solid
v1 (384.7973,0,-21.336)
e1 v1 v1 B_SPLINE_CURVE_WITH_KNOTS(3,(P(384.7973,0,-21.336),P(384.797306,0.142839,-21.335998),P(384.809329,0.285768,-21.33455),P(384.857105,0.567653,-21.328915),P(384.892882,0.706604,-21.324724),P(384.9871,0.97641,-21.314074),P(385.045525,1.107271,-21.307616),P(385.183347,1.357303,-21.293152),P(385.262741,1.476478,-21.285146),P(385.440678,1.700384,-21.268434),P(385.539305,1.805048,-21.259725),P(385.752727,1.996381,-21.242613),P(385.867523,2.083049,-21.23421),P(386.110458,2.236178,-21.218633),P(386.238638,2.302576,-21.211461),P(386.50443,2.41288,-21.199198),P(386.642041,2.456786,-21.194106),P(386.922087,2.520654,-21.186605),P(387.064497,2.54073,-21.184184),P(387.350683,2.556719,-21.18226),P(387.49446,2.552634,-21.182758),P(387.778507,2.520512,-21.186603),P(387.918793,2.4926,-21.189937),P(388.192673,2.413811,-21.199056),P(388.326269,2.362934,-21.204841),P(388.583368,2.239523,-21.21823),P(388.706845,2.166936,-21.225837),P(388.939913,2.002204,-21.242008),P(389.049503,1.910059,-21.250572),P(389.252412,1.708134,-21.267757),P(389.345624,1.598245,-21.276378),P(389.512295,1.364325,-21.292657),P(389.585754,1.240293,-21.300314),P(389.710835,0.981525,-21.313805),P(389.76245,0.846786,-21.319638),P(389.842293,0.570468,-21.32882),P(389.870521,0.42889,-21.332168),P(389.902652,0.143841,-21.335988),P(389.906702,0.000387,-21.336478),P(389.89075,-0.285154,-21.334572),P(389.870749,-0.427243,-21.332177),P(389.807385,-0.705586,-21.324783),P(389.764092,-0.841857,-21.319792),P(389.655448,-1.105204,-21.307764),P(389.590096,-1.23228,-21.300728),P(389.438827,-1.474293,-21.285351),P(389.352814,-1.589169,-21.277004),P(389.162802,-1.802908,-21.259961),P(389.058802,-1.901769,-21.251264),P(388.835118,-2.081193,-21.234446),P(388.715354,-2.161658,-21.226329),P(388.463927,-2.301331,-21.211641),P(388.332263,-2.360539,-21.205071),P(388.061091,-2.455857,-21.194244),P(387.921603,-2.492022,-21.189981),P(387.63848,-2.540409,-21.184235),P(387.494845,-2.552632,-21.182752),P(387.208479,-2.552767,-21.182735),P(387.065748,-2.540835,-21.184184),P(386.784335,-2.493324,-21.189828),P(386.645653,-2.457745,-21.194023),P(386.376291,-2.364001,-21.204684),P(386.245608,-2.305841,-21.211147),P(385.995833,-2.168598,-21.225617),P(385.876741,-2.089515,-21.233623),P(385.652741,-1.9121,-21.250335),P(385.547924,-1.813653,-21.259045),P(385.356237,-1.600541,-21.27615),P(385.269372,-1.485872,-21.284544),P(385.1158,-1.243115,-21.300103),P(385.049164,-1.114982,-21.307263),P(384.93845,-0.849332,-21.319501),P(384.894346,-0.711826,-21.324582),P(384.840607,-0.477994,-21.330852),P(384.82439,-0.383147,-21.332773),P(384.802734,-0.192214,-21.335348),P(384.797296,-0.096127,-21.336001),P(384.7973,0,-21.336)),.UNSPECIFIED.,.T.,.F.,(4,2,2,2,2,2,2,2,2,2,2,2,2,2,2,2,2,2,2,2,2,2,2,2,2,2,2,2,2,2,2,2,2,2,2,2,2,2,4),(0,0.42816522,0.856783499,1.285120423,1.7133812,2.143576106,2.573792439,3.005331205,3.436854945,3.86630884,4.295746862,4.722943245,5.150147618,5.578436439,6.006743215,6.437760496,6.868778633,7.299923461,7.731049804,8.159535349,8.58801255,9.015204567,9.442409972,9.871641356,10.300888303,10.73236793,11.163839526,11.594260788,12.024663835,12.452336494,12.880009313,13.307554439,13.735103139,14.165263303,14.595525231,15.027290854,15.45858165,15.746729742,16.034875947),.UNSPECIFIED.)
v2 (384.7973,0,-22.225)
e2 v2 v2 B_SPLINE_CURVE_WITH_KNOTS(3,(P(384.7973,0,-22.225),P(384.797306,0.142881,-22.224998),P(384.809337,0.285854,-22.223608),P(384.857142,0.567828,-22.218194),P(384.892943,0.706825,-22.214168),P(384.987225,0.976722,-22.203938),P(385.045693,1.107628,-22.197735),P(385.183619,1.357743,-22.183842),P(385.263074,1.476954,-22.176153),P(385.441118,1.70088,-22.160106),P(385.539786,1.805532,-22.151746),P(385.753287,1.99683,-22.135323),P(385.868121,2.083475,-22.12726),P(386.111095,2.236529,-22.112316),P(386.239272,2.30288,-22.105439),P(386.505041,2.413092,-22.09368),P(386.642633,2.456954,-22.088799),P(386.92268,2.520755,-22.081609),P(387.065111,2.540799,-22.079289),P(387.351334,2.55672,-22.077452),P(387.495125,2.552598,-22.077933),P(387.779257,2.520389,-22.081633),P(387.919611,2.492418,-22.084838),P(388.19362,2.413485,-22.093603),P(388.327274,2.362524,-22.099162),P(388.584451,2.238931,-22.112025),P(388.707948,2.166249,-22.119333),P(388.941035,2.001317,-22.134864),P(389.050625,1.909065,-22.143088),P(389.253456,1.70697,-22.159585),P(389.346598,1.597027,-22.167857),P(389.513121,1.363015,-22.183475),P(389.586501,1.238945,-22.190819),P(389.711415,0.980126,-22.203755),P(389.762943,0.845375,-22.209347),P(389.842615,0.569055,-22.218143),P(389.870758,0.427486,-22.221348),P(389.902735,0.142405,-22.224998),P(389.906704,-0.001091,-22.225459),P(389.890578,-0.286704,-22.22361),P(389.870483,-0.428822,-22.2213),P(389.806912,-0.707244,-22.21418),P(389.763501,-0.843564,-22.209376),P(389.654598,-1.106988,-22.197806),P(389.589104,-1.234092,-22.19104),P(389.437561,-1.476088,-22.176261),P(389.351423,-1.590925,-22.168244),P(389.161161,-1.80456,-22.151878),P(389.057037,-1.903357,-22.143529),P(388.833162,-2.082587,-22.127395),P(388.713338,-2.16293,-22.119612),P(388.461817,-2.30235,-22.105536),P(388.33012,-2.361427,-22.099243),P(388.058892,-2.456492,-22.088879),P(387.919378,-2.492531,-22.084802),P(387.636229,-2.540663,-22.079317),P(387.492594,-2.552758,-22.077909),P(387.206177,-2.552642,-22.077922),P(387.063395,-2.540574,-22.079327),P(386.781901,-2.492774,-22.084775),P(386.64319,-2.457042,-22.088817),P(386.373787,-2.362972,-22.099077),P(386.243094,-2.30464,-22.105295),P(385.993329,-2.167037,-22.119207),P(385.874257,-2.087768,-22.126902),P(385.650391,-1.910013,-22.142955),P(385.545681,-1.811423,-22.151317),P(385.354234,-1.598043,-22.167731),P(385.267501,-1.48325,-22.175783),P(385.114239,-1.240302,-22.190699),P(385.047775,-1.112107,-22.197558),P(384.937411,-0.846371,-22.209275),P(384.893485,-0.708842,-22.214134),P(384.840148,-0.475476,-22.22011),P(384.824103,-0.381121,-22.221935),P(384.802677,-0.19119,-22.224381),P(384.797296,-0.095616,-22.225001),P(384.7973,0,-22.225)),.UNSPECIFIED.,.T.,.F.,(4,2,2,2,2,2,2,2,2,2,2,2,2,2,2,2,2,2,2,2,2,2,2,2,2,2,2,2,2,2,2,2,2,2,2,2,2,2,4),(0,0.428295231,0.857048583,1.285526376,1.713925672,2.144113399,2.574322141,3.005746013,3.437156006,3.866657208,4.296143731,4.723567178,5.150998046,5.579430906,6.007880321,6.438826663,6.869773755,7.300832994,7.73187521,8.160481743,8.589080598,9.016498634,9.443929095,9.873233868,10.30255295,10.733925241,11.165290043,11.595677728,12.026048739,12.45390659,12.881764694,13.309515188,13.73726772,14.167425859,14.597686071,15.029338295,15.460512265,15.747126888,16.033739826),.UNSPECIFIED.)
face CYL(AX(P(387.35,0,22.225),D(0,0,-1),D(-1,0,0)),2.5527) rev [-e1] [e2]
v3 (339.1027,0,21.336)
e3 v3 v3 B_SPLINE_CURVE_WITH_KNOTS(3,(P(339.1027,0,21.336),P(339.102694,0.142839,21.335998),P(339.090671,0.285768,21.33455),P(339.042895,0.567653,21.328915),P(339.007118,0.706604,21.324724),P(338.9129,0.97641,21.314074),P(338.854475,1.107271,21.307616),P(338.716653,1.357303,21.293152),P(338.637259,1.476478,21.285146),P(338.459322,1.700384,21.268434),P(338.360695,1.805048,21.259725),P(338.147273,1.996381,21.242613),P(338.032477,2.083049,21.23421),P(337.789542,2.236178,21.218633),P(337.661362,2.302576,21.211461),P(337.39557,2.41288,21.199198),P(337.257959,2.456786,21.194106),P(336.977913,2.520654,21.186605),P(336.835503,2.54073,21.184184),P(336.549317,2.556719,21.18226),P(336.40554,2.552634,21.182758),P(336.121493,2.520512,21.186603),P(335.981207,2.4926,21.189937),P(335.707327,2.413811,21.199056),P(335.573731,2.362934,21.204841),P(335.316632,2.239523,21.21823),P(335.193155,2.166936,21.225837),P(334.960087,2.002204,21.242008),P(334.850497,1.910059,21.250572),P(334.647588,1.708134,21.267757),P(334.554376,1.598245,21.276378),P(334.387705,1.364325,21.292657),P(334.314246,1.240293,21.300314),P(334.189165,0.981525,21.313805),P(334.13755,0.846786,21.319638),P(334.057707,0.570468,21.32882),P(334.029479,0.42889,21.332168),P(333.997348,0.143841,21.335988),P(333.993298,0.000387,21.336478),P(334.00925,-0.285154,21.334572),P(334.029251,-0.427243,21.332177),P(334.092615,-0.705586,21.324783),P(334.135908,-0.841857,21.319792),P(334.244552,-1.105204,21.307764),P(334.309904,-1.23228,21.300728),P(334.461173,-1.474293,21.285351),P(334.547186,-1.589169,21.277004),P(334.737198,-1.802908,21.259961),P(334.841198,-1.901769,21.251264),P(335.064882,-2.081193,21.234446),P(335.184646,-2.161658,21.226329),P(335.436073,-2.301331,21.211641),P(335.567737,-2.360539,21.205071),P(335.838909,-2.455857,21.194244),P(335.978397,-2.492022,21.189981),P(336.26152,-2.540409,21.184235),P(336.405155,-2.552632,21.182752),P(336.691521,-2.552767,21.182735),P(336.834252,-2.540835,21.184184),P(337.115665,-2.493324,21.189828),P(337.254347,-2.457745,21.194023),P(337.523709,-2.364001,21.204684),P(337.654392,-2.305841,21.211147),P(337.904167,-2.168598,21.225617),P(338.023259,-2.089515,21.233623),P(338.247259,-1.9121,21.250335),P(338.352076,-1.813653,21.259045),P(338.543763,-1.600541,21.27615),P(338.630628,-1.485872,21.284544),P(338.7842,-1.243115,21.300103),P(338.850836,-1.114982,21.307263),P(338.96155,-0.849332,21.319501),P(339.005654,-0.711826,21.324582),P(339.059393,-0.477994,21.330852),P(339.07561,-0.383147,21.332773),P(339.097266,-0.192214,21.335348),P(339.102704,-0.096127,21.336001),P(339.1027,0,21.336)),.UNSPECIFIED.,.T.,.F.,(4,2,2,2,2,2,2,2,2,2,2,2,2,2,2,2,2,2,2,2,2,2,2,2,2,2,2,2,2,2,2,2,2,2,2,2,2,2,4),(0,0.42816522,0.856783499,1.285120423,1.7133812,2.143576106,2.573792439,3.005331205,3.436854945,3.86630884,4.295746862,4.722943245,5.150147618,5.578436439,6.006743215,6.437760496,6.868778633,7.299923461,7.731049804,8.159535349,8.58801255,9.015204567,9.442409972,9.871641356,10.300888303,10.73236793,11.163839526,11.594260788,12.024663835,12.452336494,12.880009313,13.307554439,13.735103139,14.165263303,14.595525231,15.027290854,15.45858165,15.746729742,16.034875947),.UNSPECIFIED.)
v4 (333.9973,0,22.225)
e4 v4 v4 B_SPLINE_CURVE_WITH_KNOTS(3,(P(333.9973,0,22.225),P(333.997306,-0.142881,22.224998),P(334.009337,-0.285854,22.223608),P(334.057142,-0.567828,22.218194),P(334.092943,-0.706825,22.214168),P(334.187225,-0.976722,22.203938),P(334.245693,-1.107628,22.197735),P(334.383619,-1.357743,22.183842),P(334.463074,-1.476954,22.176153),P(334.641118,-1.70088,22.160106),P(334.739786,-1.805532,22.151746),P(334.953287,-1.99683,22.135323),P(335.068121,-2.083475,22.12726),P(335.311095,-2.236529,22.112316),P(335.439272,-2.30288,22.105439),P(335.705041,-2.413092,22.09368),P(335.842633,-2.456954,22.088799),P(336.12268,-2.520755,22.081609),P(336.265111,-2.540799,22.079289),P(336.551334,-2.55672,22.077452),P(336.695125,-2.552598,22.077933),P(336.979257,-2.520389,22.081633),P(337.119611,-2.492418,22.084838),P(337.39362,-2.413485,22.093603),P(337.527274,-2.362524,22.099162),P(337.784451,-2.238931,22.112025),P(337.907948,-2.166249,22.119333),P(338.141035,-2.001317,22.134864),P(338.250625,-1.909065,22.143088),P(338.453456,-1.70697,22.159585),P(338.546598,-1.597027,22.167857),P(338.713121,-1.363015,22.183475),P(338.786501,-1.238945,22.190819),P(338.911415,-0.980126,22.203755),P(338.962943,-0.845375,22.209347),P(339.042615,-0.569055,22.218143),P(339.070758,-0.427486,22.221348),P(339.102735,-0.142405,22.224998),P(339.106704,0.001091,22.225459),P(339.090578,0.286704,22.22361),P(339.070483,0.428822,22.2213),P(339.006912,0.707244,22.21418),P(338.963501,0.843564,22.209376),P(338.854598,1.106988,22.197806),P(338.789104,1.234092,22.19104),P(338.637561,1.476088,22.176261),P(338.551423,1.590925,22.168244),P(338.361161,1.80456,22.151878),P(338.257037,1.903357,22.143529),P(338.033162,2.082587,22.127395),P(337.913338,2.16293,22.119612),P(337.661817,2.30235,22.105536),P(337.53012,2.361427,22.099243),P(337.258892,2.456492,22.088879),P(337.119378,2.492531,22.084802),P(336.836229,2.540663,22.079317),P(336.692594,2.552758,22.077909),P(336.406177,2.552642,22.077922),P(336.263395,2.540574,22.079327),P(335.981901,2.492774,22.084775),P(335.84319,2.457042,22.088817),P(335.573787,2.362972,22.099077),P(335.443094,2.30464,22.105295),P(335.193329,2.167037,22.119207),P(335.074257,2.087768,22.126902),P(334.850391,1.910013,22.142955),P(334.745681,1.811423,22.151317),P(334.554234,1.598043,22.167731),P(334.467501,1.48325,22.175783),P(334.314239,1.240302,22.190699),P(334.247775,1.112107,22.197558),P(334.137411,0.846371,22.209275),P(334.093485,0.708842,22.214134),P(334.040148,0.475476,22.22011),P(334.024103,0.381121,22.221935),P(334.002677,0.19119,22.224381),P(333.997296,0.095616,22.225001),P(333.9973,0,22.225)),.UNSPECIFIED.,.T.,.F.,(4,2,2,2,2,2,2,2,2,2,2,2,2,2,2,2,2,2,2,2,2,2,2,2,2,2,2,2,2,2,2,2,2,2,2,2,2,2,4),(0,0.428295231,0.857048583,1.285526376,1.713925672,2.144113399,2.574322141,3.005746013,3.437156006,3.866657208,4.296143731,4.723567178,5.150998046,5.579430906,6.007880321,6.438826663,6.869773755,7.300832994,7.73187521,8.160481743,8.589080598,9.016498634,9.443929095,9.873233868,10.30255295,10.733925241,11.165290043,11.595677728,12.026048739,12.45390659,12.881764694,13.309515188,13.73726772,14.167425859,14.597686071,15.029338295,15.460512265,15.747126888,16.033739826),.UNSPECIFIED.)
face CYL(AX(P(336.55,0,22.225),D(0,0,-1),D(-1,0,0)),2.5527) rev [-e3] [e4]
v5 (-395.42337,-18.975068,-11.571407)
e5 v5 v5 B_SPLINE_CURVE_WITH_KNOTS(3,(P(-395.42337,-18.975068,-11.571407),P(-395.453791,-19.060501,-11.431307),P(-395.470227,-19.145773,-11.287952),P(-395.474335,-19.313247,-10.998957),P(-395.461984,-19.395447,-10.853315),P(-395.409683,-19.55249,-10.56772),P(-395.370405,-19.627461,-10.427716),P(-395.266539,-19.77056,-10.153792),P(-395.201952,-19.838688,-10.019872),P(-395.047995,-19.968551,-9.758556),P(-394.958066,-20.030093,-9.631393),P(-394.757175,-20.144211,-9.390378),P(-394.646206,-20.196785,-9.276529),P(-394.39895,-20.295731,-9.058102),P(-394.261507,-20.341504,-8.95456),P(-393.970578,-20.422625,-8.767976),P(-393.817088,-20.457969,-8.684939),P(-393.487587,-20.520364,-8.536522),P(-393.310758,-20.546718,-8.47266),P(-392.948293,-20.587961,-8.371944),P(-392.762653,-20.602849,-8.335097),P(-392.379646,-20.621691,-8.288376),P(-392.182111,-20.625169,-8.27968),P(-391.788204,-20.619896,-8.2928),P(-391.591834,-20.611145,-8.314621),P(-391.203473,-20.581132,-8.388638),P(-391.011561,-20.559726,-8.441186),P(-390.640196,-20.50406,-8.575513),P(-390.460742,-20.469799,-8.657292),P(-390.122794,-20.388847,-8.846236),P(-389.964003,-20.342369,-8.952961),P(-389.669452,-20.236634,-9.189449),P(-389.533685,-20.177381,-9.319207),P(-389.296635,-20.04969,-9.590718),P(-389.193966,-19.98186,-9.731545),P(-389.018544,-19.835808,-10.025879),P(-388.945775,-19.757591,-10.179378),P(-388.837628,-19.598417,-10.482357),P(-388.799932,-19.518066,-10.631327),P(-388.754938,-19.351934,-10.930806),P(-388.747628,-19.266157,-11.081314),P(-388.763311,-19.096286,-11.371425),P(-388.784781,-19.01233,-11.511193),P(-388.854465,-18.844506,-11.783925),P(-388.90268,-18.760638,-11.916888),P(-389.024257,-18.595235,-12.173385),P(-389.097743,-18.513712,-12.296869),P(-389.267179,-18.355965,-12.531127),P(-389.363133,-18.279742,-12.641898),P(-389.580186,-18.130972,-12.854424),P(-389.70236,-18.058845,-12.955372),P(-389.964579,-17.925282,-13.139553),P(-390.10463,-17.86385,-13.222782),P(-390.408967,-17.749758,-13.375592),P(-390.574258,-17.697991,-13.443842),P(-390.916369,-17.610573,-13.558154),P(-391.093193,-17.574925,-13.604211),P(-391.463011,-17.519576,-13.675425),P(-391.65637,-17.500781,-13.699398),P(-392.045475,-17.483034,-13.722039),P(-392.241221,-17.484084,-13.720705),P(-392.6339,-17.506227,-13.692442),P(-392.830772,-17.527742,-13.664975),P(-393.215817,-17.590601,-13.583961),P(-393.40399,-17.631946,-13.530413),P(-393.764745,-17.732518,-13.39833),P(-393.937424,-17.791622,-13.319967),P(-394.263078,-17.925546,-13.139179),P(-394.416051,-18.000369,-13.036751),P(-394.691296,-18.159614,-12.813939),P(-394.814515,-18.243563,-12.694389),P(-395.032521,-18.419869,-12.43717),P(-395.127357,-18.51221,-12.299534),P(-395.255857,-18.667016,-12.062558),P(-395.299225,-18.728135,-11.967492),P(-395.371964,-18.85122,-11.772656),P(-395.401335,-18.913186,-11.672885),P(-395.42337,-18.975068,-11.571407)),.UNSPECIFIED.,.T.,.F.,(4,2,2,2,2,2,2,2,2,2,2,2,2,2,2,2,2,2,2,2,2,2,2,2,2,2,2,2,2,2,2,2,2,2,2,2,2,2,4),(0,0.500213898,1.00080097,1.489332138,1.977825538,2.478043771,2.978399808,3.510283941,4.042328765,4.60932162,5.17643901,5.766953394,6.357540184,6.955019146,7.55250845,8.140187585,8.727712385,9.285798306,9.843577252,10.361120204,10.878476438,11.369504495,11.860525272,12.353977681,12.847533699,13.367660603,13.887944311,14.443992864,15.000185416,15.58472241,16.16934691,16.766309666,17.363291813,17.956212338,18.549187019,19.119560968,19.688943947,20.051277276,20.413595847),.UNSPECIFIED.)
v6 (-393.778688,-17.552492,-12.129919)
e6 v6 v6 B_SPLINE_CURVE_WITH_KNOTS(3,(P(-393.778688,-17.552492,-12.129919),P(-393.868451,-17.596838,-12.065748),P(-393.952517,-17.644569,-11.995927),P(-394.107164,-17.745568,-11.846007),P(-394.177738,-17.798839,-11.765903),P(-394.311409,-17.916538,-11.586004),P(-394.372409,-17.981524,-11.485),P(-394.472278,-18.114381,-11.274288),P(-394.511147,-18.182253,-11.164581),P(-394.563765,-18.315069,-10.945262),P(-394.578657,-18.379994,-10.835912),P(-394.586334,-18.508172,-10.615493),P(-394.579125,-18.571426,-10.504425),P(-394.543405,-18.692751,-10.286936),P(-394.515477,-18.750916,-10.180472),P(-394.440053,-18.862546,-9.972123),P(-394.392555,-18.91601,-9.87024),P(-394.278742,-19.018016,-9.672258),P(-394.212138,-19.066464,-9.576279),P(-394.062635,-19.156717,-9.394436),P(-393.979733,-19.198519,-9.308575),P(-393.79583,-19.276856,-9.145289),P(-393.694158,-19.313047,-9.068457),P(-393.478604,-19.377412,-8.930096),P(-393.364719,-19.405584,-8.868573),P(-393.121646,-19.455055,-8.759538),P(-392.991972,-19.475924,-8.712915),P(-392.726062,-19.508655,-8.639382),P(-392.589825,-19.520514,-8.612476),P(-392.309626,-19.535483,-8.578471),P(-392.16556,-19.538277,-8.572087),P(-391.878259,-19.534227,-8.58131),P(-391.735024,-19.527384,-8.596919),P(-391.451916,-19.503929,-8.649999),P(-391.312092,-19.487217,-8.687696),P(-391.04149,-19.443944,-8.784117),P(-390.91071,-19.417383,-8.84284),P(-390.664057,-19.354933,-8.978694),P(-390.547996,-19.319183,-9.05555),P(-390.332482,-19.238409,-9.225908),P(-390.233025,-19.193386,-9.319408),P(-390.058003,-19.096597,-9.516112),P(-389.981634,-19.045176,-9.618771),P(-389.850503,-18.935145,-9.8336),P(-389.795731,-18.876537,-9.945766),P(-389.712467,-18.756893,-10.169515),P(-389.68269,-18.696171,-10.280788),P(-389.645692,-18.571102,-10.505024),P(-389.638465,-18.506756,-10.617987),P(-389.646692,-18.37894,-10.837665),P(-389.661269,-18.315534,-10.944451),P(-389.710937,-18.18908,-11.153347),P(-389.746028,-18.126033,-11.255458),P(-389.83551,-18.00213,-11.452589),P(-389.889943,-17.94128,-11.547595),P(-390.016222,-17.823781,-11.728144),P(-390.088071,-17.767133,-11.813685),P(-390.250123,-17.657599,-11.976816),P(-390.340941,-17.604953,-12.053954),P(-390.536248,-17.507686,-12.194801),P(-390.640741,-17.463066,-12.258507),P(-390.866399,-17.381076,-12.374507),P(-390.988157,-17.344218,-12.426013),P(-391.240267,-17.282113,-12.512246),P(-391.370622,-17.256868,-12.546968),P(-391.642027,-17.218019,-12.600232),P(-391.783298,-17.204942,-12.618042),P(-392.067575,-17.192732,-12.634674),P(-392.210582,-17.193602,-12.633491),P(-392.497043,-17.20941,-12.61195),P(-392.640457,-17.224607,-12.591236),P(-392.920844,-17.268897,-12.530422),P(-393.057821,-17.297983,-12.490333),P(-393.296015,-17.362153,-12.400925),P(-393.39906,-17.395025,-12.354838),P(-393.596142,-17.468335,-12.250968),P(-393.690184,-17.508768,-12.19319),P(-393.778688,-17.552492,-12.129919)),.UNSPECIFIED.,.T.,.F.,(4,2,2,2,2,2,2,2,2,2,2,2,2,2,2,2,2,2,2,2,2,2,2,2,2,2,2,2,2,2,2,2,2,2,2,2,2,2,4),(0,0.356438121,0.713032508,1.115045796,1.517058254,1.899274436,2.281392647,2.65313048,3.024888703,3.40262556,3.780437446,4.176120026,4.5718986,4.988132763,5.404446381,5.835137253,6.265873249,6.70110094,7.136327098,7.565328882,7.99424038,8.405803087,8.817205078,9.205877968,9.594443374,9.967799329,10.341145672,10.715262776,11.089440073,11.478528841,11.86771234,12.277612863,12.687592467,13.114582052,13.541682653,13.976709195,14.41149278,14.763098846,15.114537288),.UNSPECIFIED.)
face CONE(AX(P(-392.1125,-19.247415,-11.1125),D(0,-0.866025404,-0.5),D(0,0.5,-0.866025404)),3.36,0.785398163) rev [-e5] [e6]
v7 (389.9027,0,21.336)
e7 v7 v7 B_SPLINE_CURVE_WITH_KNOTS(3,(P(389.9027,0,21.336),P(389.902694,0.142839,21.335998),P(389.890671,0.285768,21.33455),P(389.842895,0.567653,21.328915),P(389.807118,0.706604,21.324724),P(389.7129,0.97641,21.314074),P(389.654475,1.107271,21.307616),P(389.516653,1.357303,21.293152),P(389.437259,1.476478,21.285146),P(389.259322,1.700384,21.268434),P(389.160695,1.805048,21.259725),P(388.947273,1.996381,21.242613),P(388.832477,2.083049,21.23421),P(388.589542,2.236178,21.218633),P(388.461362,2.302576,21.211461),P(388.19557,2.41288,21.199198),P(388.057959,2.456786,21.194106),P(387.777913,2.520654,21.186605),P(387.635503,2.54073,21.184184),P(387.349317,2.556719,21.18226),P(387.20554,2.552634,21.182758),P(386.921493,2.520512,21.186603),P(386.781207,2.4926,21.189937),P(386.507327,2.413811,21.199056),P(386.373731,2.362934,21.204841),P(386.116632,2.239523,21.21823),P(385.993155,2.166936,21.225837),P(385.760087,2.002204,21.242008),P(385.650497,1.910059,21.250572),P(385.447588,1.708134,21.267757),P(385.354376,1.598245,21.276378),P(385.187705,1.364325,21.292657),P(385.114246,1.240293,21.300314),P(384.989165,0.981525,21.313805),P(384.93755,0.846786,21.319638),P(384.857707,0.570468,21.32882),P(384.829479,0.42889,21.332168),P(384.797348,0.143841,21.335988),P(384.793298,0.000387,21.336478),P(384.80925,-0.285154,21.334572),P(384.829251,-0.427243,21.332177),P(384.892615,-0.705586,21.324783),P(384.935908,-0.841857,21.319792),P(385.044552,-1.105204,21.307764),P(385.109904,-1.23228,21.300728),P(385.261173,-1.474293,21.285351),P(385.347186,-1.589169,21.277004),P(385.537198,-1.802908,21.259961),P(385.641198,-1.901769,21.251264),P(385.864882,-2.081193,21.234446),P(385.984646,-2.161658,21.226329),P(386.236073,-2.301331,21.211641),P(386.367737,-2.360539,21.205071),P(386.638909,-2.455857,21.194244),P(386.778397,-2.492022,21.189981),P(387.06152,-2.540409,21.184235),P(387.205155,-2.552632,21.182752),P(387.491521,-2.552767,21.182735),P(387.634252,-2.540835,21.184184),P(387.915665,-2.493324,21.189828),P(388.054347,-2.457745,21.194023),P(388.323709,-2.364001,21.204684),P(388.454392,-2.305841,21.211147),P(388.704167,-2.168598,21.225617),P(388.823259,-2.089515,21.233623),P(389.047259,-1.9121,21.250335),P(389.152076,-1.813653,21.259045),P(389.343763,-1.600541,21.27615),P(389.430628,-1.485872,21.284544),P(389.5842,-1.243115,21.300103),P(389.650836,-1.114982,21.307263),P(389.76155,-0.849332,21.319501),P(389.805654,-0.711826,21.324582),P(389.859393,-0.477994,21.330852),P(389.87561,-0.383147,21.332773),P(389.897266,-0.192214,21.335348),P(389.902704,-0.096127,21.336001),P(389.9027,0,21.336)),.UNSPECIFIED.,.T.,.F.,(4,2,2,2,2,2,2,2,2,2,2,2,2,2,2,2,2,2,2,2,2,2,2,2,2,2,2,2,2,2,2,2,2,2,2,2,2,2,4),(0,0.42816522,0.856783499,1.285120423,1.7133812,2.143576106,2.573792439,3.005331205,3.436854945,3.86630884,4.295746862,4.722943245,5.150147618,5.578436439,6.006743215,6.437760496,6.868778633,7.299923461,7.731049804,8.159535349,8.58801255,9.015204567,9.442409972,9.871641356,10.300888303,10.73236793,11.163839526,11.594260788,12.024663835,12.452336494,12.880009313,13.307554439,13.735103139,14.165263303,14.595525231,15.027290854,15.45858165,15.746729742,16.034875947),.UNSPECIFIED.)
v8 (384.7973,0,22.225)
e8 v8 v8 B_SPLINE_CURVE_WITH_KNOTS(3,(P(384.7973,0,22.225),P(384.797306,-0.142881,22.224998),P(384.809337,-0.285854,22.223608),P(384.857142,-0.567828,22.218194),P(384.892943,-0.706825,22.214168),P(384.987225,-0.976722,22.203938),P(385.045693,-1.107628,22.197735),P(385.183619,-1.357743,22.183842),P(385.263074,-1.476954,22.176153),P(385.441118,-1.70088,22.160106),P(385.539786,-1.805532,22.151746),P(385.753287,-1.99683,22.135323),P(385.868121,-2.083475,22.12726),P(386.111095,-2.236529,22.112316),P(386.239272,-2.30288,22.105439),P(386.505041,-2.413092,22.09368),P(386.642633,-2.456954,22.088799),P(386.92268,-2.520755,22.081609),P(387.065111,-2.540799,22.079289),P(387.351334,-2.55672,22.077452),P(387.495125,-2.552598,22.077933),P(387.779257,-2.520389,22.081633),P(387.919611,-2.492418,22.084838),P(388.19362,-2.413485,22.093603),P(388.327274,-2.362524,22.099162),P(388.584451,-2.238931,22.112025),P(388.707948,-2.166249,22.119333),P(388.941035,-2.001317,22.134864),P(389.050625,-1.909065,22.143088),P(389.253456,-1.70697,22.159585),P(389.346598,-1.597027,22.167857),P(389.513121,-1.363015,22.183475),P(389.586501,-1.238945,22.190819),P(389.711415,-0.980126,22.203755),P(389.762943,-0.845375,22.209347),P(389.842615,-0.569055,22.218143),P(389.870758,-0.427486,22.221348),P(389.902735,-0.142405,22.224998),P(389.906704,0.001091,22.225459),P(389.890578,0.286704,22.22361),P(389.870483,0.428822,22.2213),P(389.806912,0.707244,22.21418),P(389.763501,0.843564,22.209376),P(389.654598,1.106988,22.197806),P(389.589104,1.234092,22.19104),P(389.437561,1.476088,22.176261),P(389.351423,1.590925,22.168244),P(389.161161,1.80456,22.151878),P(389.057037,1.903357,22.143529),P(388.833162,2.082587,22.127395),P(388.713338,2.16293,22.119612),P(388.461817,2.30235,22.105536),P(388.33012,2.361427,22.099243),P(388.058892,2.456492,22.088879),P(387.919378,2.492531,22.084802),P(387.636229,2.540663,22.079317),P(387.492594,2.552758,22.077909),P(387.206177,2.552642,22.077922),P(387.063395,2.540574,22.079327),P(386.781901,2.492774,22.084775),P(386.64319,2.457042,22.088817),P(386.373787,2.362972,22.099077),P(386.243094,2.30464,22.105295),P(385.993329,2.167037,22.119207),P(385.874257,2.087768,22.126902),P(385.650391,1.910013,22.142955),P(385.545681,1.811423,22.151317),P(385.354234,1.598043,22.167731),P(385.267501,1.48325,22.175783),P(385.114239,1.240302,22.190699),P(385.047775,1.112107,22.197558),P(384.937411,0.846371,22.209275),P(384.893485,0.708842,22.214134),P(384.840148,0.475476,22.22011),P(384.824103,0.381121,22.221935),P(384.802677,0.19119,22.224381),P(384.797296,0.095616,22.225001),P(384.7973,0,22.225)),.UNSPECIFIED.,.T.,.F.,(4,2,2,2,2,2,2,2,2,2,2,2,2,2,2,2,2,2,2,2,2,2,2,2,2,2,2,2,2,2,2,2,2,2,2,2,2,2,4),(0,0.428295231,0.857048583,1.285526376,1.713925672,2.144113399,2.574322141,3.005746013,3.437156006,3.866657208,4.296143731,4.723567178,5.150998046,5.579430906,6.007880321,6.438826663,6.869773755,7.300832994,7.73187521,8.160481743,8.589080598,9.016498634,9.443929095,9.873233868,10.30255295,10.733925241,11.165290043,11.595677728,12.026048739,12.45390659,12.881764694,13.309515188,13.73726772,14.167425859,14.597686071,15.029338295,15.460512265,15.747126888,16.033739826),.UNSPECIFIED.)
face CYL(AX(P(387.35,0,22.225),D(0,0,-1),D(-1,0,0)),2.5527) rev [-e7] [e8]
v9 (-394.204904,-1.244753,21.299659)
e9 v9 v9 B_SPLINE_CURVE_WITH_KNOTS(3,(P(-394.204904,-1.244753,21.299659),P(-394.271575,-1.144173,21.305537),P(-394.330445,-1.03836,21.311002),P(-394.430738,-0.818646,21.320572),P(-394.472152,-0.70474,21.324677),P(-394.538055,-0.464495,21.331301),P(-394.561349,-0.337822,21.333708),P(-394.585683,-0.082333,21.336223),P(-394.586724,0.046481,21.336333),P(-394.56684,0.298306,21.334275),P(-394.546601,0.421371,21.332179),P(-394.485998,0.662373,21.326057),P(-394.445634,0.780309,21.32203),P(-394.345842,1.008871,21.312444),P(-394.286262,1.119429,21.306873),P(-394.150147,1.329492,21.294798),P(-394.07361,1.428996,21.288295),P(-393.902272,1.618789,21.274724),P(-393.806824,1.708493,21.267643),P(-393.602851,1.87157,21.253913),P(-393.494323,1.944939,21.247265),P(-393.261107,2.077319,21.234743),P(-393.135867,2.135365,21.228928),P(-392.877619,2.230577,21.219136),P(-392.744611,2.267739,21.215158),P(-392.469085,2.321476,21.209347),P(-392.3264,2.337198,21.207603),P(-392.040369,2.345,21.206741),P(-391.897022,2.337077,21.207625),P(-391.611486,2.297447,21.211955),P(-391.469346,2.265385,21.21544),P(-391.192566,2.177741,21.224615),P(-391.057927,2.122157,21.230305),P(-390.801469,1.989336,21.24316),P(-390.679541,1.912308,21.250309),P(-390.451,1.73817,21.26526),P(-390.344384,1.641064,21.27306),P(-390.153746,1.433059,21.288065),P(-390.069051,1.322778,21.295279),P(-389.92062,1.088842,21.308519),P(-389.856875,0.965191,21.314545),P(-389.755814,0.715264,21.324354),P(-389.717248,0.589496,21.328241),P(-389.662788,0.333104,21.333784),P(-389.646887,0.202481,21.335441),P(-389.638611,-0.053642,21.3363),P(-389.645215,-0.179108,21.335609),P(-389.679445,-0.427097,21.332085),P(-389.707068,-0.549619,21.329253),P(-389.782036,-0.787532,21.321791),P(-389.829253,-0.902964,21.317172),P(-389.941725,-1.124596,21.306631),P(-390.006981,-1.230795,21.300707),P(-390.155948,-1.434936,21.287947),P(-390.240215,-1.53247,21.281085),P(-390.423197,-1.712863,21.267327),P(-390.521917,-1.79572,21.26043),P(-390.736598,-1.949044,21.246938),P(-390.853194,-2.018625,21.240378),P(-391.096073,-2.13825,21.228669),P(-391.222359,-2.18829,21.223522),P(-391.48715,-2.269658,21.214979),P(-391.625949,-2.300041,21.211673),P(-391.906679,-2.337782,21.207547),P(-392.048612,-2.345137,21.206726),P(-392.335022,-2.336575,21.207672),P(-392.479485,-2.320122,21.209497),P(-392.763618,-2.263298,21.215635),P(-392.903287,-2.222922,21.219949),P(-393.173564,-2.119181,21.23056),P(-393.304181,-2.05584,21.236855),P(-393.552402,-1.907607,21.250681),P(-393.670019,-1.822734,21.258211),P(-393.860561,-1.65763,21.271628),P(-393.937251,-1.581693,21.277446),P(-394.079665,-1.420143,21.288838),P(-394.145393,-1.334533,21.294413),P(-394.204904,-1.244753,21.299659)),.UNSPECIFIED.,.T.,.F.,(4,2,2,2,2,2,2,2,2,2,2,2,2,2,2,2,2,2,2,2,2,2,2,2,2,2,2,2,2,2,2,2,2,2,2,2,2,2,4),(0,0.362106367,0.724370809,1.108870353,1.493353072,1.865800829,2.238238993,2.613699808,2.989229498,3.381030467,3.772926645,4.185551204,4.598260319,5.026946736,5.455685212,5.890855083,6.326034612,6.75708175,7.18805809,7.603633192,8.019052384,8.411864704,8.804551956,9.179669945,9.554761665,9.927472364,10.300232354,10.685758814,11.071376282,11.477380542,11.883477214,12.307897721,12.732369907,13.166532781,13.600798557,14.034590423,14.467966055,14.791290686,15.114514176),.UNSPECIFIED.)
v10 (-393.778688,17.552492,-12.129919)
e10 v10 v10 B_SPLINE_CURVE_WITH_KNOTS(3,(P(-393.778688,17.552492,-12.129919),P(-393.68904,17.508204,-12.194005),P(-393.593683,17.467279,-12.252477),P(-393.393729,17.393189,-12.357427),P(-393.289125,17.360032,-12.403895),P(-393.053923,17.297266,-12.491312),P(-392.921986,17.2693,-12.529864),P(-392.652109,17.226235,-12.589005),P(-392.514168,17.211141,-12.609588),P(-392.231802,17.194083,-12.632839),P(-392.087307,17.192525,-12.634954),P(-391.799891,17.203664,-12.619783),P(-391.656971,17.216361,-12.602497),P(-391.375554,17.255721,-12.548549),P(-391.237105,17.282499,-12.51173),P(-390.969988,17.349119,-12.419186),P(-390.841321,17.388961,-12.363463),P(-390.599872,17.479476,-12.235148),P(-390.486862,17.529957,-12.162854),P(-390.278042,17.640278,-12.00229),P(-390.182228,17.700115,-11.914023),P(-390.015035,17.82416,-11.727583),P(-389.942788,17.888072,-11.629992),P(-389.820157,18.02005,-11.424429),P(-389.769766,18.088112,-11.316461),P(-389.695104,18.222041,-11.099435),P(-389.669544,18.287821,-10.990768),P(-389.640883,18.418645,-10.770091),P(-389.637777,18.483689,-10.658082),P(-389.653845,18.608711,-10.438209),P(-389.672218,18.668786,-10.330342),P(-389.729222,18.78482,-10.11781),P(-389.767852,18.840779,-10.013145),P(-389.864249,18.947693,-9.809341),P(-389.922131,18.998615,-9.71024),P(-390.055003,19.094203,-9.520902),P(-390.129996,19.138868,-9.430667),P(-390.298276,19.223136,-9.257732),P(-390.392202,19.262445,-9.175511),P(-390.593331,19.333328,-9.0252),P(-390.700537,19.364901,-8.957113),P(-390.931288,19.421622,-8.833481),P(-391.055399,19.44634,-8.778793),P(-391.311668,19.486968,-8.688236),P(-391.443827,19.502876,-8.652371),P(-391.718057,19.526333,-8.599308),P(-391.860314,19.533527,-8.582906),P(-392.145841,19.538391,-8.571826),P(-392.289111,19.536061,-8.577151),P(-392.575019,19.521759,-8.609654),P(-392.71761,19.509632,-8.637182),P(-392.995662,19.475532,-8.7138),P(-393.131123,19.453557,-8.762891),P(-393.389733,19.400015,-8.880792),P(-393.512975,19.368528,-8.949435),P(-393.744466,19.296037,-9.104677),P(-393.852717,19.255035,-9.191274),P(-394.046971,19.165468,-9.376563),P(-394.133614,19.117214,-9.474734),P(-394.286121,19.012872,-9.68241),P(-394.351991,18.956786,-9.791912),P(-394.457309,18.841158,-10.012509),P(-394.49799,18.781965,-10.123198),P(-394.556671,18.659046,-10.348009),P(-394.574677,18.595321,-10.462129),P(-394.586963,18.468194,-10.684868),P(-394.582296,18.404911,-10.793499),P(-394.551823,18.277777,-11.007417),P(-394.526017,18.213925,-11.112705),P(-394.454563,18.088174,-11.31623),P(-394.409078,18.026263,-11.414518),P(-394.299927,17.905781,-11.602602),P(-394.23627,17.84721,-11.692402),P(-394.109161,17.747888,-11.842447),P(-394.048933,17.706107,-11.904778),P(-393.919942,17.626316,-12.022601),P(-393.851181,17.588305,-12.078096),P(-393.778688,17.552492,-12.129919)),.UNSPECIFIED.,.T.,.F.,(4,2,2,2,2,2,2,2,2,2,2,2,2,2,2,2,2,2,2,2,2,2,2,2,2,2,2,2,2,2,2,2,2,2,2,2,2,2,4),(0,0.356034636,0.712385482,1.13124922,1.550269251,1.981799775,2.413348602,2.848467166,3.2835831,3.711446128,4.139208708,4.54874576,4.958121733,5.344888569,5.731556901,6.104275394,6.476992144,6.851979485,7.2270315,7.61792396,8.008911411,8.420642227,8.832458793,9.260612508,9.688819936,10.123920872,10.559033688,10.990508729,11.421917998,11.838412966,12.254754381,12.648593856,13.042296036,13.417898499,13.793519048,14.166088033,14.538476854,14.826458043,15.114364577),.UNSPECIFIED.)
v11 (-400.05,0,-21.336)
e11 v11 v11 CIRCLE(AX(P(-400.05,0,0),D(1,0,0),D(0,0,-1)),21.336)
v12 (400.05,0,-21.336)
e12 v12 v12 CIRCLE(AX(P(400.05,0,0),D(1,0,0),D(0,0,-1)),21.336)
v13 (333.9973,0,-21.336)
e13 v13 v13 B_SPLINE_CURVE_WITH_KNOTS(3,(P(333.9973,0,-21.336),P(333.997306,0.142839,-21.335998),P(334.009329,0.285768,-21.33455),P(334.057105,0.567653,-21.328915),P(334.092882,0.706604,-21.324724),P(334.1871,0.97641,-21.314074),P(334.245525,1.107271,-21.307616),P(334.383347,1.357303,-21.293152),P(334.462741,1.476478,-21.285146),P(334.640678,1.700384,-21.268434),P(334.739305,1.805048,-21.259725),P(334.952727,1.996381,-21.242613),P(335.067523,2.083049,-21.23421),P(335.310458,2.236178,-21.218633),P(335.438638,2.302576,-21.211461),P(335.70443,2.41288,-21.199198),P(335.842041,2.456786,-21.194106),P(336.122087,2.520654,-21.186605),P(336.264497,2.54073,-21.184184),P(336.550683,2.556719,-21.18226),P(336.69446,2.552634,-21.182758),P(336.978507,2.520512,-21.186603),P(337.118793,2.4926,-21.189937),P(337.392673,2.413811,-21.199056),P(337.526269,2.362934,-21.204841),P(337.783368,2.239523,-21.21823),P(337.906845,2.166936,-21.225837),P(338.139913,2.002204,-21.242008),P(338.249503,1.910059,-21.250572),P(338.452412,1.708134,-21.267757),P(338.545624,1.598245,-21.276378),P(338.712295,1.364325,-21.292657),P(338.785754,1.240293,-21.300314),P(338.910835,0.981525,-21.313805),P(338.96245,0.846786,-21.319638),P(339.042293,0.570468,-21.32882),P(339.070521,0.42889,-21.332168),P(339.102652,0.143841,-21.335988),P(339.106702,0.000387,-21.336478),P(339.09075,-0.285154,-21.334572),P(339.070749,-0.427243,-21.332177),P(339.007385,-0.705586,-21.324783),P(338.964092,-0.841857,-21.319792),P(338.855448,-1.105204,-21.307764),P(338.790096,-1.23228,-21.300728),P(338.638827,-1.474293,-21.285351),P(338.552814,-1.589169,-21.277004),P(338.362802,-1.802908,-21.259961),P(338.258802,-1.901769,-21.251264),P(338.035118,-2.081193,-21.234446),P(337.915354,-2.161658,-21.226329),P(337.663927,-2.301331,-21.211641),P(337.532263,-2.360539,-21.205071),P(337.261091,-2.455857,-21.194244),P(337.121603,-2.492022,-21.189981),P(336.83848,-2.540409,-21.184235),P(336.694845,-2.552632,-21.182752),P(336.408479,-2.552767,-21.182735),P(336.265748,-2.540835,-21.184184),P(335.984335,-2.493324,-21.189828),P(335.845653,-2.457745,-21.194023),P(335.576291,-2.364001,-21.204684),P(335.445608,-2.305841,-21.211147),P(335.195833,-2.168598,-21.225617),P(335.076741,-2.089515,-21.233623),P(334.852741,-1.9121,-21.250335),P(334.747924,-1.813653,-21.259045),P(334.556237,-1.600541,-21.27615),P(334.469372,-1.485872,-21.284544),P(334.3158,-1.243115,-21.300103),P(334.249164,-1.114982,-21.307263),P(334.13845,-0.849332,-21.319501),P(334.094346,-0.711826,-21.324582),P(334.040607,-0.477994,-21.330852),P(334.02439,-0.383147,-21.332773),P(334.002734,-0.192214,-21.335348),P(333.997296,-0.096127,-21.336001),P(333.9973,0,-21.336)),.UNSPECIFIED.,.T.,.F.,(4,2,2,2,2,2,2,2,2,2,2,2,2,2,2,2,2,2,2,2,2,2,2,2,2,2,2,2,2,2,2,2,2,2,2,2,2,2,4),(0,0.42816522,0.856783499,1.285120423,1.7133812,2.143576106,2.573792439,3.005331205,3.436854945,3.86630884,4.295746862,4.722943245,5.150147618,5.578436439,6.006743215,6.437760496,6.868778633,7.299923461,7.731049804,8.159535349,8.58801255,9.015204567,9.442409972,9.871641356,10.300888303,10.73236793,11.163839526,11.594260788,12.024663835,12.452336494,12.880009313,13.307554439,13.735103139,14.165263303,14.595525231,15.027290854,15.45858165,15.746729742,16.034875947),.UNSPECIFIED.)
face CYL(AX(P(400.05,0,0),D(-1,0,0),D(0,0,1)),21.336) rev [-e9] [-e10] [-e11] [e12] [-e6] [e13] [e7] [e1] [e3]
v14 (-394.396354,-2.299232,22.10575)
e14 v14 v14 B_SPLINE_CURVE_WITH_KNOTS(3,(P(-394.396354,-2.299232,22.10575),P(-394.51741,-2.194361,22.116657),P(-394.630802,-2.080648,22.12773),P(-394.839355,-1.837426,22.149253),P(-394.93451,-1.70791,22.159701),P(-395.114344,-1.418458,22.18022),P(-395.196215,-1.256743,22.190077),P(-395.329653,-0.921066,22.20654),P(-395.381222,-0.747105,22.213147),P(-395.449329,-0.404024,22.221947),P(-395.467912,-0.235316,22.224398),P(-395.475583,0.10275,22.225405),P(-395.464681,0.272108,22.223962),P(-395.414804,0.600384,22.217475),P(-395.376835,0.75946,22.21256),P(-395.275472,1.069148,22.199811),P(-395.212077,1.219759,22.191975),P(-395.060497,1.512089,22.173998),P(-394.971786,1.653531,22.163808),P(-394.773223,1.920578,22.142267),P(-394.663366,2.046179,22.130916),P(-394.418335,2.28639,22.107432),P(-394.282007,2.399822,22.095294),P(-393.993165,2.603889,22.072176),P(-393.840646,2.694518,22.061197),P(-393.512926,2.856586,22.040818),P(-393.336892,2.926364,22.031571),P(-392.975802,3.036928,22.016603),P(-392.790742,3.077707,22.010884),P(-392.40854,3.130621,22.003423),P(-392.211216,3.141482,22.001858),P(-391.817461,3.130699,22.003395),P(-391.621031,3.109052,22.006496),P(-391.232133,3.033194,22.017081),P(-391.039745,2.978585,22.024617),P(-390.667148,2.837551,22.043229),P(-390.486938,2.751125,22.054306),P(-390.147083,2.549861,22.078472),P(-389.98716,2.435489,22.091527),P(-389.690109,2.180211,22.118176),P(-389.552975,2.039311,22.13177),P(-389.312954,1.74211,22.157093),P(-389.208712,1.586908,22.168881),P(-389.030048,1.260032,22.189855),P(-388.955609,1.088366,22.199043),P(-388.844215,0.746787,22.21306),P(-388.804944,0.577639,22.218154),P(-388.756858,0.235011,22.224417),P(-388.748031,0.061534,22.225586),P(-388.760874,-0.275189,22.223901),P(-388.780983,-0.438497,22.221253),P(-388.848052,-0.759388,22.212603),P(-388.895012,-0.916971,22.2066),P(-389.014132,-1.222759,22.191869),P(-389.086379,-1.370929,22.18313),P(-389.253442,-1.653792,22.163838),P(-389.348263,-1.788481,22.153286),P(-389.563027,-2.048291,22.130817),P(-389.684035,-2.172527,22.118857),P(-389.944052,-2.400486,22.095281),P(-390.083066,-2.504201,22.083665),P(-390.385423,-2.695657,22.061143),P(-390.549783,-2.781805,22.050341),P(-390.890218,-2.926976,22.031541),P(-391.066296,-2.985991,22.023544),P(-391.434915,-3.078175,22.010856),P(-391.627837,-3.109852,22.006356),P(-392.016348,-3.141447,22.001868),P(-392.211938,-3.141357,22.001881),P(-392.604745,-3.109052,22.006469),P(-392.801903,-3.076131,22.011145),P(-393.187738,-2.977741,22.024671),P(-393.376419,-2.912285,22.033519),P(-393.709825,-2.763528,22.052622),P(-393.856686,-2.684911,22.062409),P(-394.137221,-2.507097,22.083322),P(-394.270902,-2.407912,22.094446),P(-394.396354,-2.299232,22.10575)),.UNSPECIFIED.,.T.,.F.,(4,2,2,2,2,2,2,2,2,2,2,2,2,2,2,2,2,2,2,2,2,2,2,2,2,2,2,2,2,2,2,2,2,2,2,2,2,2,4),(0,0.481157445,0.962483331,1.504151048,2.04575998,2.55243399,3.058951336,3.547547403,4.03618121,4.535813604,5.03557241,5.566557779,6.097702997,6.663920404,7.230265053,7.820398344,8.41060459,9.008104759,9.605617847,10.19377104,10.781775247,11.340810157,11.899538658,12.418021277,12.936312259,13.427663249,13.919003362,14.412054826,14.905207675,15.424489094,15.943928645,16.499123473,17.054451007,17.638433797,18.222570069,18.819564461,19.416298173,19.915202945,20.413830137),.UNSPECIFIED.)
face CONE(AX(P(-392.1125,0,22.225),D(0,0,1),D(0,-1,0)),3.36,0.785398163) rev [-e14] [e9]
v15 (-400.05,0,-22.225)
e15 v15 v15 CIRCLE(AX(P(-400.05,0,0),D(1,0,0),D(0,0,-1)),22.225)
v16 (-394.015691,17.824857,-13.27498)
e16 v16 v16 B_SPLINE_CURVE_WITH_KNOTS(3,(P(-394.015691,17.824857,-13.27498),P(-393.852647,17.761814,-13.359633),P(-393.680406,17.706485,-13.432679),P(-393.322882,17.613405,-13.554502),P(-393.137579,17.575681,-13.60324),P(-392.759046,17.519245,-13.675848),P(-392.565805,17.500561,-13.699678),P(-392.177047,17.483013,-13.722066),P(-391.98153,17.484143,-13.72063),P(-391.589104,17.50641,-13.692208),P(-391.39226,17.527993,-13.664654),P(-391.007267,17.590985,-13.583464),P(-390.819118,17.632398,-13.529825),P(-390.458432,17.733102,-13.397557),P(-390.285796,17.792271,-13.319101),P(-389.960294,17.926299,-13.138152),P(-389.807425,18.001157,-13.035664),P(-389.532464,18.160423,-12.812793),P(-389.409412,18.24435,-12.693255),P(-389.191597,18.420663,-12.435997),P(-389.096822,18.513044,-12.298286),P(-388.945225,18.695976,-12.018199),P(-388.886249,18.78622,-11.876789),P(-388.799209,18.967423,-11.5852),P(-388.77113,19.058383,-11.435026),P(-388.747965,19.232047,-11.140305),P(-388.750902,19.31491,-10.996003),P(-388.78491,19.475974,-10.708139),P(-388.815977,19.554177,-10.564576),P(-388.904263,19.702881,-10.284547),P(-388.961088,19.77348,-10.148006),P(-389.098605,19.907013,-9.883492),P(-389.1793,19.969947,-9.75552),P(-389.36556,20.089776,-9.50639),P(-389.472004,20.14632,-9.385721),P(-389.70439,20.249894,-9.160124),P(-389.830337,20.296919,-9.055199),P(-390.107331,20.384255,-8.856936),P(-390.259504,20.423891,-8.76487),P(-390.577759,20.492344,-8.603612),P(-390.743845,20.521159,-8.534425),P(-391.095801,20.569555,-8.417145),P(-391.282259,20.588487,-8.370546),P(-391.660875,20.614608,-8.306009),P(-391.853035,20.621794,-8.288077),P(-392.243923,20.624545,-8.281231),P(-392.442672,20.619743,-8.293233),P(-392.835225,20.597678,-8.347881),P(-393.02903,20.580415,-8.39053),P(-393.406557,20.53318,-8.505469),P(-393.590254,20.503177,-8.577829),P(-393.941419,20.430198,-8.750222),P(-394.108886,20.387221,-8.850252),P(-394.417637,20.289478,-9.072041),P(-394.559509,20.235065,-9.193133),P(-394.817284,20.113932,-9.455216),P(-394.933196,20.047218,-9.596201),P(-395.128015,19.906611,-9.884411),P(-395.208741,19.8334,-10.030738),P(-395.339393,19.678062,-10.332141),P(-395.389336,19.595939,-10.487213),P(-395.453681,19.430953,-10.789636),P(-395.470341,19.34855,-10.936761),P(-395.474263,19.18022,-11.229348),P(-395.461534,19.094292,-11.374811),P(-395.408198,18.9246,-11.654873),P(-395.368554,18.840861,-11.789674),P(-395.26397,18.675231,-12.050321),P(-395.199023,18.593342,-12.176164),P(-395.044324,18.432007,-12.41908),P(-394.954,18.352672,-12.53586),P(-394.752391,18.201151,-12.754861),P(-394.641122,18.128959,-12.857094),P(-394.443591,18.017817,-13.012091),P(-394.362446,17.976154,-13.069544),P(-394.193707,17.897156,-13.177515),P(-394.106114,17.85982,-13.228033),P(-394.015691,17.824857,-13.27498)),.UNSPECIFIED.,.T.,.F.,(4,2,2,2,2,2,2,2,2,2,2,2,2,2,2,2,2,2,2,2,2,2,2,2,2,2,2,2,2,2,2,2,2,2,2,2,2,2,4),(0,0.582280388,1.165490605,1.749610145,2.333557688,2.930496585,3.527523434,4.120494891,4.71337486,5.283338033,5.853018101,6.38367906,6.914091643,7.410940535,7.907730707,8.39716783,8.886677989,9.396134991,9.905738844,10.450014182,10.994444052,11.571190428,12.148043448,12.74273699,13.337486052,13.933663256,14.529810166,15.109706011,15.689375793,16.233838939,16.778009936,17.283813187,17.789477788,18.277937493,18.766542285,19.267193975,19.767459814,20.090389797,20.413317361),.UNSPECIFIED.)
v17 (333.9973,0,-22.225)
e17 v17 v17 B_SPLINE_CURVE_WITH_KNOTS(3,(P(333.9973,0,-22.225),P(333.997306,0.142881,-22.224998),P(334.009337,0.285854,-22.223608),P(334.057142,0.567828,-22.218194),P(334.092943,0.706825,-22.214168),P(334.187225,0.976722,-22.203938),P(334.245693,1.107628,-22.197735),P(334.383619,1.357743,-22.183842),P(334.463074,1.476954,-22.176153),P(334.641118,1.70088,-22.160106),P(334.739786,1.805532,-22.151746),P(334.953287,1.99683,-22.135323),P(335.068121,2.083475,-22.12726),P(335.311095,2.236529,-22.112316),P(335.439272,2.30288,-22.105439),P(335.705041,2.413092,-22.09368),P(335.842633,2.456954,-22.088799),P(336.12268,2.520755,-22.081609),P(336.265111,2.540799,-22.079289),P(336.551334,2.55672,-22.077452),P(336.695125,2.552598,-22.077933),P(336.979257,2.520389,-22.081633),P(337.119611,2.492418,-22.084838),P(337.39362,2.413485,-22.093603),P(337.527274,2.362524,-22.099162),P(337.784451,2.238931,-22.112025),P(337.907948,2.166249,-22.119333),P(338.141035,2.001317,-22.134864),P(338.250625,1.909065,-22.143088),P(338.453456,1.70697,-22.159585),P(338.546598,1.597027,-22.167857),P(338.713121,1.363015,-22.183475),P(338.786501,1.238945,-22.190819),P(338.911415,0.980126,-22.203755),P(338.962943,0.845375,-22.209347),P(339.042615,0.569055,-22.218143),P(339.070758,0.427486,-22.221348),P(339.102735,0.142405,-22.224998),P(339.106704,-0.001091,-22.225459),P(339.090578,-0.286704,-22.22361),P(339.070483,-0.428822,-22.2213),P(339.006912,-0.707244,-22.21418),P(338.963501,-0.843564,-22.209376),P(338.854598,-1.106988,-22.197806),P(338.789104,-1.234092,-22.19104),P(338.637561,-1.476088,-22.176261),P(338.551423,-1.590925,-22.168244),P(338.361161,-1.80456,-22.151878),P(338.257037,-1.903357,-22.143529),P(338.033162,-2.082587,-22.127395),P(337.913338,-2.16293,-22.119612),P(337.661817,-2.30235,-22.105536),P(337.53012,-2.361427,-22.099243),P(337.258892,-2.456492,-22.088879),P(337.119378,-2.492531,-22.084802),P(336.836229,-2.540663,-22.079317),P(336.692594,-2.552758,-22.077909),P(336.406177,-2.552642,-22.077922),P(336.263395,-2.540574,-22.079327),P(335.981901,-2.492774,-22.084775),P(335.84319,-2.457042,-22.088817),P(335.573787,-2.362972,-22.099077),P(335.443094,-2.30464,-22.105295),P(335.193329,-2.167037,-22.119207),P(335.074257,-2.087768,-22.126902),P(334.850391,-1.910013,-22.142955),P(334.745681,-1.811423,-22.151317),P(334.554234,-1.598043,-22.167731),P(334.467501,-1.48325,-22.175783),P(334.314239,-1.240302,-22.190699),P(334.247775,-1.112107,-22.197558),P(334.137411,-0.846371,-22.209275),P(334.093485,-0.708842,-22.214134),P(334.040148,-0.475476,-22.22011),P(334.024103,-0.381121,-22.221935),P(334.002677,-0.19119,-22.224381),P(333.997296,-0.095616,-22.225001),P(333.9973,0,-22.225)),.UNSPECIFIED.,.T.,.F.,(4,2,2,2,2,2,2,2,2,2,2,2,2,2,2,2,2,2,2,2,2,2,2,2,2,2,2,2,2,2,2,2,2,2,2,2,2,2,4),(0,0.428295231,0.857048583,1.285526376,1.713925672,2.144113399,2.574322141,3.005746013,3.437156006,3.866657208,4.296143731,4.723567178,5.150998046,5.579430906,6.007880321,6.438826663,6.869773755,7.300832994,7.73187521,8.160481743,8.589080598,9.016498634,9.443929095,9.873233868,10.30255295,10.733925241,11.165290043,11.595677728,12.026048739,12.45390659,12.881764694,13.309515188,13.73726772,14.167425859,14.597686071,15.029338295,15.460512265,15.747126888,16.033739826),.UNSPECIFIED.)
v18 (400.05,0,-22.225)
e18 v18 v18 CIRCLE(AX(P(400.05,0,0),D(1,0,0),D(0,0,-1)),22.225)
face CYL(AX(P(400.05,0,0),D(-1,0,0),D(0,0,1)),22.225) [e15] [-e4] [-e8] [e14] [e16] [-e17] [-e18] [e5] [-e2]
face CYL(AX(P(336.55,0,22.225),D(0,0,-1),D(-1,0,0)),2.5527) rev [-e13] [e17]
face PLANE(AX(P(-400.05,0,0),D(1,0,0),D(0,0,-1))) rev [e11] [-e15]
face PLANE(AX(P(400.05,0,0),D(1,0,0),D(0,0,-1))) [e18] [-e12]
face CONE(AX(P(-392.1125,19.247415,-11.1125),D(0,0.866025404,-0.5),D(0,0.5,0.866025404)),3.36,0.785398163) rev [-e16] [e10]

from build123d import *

# Parameters (mm, degrees)
SKETCH3_R               = 22.225
SKETCH3_R_2             = 21.336
BOSS_EXTRUDE1_DEPTH     = 400.05
CUT_EXTRUDE1_DEPTH      = 402.282822645
CUT_EXTRUDE1_DEPTH_BACK = 402.282822645
SKETCH4_R               = 2.5527
CIRPATTERN1_COUNT       = 3


# Read off the part's stored shape, not the designer's step: CSK for M3 SFHCS1
with BuildPart() as part:
    # Sketch3 → Boss-Extrude1 (new, symmetric)
    with BuildSketch(Plane(origin=(0, 0, 0), x_dir=(0, 0, -1), z_dir=(1, 0, 0))):
        with Locations(Location((0, 0, 0), (0, 0, 180))):
            Circle(SKETCH3_R)
        with Locations(Location((0, 0, 0), (0, 0, 180))):
            Circle(SKETCH3_R_2, mode=Mode.SUBTRACT)
    extrude(amount=BOSS_EXTRUDE1_DEPTH, both=True)

    # Sketch4 → Cut-Extrude1 (cut, two sides: drawn at the far end of the back side and taken through both)
    with BuildSketch(Plane.XY.offset(-CUT_EXTRUDE1_DEPTH_BACK)):
        with Locations(Location((336.55, 0, 0), (0, 0, 180))):
            Circle(SKETCH4_R)
        with Locations(Location((387.35, 0, 0), (0, 0, 180))):
            Circle(SKETCH4_R)
    extrude(amount=CUT_EXTRUDE1_DEPTH + CUT_EXTRUDE1_DEPTH_BACK, mode=Mode.SUBTRACT)

    # CSK for M3 SFHCS1 outline → CSK for M3 SFHCS1 (revolve, cut)
    with BuildSketch(Plane(origin=(-392.1125, 0, 0), x_dir=(1, 0, 0), z_dir=(0, -1, 0))):
        Polygon((3.360105502, 22.225105502), (0, 22.225105502), (0, 21.206997784), (2.341997784, 21.206997784), align=None)
    csk_for_m3_sfhcs1 = revolve(axis=Axis((-392.1125, 0, 0), (0, 0, 1)), mode=Mode.SUBTRACT)

    # CirPattern1: CSK for M3 SFHCS1 ×3 about axis
    cirpattern1_axis = Axis((400.05, 0, 0), (-1, 0, 0))
    for i in range(1, CIRPATTERN1_COUNT):
        add(csk_for_m3_sfhcs1.rotate(cirpattern1_axis, i * 360 / CIRPATTERN1_COUNT), mode=Mode.SUBTRACT)


solid = part.part
